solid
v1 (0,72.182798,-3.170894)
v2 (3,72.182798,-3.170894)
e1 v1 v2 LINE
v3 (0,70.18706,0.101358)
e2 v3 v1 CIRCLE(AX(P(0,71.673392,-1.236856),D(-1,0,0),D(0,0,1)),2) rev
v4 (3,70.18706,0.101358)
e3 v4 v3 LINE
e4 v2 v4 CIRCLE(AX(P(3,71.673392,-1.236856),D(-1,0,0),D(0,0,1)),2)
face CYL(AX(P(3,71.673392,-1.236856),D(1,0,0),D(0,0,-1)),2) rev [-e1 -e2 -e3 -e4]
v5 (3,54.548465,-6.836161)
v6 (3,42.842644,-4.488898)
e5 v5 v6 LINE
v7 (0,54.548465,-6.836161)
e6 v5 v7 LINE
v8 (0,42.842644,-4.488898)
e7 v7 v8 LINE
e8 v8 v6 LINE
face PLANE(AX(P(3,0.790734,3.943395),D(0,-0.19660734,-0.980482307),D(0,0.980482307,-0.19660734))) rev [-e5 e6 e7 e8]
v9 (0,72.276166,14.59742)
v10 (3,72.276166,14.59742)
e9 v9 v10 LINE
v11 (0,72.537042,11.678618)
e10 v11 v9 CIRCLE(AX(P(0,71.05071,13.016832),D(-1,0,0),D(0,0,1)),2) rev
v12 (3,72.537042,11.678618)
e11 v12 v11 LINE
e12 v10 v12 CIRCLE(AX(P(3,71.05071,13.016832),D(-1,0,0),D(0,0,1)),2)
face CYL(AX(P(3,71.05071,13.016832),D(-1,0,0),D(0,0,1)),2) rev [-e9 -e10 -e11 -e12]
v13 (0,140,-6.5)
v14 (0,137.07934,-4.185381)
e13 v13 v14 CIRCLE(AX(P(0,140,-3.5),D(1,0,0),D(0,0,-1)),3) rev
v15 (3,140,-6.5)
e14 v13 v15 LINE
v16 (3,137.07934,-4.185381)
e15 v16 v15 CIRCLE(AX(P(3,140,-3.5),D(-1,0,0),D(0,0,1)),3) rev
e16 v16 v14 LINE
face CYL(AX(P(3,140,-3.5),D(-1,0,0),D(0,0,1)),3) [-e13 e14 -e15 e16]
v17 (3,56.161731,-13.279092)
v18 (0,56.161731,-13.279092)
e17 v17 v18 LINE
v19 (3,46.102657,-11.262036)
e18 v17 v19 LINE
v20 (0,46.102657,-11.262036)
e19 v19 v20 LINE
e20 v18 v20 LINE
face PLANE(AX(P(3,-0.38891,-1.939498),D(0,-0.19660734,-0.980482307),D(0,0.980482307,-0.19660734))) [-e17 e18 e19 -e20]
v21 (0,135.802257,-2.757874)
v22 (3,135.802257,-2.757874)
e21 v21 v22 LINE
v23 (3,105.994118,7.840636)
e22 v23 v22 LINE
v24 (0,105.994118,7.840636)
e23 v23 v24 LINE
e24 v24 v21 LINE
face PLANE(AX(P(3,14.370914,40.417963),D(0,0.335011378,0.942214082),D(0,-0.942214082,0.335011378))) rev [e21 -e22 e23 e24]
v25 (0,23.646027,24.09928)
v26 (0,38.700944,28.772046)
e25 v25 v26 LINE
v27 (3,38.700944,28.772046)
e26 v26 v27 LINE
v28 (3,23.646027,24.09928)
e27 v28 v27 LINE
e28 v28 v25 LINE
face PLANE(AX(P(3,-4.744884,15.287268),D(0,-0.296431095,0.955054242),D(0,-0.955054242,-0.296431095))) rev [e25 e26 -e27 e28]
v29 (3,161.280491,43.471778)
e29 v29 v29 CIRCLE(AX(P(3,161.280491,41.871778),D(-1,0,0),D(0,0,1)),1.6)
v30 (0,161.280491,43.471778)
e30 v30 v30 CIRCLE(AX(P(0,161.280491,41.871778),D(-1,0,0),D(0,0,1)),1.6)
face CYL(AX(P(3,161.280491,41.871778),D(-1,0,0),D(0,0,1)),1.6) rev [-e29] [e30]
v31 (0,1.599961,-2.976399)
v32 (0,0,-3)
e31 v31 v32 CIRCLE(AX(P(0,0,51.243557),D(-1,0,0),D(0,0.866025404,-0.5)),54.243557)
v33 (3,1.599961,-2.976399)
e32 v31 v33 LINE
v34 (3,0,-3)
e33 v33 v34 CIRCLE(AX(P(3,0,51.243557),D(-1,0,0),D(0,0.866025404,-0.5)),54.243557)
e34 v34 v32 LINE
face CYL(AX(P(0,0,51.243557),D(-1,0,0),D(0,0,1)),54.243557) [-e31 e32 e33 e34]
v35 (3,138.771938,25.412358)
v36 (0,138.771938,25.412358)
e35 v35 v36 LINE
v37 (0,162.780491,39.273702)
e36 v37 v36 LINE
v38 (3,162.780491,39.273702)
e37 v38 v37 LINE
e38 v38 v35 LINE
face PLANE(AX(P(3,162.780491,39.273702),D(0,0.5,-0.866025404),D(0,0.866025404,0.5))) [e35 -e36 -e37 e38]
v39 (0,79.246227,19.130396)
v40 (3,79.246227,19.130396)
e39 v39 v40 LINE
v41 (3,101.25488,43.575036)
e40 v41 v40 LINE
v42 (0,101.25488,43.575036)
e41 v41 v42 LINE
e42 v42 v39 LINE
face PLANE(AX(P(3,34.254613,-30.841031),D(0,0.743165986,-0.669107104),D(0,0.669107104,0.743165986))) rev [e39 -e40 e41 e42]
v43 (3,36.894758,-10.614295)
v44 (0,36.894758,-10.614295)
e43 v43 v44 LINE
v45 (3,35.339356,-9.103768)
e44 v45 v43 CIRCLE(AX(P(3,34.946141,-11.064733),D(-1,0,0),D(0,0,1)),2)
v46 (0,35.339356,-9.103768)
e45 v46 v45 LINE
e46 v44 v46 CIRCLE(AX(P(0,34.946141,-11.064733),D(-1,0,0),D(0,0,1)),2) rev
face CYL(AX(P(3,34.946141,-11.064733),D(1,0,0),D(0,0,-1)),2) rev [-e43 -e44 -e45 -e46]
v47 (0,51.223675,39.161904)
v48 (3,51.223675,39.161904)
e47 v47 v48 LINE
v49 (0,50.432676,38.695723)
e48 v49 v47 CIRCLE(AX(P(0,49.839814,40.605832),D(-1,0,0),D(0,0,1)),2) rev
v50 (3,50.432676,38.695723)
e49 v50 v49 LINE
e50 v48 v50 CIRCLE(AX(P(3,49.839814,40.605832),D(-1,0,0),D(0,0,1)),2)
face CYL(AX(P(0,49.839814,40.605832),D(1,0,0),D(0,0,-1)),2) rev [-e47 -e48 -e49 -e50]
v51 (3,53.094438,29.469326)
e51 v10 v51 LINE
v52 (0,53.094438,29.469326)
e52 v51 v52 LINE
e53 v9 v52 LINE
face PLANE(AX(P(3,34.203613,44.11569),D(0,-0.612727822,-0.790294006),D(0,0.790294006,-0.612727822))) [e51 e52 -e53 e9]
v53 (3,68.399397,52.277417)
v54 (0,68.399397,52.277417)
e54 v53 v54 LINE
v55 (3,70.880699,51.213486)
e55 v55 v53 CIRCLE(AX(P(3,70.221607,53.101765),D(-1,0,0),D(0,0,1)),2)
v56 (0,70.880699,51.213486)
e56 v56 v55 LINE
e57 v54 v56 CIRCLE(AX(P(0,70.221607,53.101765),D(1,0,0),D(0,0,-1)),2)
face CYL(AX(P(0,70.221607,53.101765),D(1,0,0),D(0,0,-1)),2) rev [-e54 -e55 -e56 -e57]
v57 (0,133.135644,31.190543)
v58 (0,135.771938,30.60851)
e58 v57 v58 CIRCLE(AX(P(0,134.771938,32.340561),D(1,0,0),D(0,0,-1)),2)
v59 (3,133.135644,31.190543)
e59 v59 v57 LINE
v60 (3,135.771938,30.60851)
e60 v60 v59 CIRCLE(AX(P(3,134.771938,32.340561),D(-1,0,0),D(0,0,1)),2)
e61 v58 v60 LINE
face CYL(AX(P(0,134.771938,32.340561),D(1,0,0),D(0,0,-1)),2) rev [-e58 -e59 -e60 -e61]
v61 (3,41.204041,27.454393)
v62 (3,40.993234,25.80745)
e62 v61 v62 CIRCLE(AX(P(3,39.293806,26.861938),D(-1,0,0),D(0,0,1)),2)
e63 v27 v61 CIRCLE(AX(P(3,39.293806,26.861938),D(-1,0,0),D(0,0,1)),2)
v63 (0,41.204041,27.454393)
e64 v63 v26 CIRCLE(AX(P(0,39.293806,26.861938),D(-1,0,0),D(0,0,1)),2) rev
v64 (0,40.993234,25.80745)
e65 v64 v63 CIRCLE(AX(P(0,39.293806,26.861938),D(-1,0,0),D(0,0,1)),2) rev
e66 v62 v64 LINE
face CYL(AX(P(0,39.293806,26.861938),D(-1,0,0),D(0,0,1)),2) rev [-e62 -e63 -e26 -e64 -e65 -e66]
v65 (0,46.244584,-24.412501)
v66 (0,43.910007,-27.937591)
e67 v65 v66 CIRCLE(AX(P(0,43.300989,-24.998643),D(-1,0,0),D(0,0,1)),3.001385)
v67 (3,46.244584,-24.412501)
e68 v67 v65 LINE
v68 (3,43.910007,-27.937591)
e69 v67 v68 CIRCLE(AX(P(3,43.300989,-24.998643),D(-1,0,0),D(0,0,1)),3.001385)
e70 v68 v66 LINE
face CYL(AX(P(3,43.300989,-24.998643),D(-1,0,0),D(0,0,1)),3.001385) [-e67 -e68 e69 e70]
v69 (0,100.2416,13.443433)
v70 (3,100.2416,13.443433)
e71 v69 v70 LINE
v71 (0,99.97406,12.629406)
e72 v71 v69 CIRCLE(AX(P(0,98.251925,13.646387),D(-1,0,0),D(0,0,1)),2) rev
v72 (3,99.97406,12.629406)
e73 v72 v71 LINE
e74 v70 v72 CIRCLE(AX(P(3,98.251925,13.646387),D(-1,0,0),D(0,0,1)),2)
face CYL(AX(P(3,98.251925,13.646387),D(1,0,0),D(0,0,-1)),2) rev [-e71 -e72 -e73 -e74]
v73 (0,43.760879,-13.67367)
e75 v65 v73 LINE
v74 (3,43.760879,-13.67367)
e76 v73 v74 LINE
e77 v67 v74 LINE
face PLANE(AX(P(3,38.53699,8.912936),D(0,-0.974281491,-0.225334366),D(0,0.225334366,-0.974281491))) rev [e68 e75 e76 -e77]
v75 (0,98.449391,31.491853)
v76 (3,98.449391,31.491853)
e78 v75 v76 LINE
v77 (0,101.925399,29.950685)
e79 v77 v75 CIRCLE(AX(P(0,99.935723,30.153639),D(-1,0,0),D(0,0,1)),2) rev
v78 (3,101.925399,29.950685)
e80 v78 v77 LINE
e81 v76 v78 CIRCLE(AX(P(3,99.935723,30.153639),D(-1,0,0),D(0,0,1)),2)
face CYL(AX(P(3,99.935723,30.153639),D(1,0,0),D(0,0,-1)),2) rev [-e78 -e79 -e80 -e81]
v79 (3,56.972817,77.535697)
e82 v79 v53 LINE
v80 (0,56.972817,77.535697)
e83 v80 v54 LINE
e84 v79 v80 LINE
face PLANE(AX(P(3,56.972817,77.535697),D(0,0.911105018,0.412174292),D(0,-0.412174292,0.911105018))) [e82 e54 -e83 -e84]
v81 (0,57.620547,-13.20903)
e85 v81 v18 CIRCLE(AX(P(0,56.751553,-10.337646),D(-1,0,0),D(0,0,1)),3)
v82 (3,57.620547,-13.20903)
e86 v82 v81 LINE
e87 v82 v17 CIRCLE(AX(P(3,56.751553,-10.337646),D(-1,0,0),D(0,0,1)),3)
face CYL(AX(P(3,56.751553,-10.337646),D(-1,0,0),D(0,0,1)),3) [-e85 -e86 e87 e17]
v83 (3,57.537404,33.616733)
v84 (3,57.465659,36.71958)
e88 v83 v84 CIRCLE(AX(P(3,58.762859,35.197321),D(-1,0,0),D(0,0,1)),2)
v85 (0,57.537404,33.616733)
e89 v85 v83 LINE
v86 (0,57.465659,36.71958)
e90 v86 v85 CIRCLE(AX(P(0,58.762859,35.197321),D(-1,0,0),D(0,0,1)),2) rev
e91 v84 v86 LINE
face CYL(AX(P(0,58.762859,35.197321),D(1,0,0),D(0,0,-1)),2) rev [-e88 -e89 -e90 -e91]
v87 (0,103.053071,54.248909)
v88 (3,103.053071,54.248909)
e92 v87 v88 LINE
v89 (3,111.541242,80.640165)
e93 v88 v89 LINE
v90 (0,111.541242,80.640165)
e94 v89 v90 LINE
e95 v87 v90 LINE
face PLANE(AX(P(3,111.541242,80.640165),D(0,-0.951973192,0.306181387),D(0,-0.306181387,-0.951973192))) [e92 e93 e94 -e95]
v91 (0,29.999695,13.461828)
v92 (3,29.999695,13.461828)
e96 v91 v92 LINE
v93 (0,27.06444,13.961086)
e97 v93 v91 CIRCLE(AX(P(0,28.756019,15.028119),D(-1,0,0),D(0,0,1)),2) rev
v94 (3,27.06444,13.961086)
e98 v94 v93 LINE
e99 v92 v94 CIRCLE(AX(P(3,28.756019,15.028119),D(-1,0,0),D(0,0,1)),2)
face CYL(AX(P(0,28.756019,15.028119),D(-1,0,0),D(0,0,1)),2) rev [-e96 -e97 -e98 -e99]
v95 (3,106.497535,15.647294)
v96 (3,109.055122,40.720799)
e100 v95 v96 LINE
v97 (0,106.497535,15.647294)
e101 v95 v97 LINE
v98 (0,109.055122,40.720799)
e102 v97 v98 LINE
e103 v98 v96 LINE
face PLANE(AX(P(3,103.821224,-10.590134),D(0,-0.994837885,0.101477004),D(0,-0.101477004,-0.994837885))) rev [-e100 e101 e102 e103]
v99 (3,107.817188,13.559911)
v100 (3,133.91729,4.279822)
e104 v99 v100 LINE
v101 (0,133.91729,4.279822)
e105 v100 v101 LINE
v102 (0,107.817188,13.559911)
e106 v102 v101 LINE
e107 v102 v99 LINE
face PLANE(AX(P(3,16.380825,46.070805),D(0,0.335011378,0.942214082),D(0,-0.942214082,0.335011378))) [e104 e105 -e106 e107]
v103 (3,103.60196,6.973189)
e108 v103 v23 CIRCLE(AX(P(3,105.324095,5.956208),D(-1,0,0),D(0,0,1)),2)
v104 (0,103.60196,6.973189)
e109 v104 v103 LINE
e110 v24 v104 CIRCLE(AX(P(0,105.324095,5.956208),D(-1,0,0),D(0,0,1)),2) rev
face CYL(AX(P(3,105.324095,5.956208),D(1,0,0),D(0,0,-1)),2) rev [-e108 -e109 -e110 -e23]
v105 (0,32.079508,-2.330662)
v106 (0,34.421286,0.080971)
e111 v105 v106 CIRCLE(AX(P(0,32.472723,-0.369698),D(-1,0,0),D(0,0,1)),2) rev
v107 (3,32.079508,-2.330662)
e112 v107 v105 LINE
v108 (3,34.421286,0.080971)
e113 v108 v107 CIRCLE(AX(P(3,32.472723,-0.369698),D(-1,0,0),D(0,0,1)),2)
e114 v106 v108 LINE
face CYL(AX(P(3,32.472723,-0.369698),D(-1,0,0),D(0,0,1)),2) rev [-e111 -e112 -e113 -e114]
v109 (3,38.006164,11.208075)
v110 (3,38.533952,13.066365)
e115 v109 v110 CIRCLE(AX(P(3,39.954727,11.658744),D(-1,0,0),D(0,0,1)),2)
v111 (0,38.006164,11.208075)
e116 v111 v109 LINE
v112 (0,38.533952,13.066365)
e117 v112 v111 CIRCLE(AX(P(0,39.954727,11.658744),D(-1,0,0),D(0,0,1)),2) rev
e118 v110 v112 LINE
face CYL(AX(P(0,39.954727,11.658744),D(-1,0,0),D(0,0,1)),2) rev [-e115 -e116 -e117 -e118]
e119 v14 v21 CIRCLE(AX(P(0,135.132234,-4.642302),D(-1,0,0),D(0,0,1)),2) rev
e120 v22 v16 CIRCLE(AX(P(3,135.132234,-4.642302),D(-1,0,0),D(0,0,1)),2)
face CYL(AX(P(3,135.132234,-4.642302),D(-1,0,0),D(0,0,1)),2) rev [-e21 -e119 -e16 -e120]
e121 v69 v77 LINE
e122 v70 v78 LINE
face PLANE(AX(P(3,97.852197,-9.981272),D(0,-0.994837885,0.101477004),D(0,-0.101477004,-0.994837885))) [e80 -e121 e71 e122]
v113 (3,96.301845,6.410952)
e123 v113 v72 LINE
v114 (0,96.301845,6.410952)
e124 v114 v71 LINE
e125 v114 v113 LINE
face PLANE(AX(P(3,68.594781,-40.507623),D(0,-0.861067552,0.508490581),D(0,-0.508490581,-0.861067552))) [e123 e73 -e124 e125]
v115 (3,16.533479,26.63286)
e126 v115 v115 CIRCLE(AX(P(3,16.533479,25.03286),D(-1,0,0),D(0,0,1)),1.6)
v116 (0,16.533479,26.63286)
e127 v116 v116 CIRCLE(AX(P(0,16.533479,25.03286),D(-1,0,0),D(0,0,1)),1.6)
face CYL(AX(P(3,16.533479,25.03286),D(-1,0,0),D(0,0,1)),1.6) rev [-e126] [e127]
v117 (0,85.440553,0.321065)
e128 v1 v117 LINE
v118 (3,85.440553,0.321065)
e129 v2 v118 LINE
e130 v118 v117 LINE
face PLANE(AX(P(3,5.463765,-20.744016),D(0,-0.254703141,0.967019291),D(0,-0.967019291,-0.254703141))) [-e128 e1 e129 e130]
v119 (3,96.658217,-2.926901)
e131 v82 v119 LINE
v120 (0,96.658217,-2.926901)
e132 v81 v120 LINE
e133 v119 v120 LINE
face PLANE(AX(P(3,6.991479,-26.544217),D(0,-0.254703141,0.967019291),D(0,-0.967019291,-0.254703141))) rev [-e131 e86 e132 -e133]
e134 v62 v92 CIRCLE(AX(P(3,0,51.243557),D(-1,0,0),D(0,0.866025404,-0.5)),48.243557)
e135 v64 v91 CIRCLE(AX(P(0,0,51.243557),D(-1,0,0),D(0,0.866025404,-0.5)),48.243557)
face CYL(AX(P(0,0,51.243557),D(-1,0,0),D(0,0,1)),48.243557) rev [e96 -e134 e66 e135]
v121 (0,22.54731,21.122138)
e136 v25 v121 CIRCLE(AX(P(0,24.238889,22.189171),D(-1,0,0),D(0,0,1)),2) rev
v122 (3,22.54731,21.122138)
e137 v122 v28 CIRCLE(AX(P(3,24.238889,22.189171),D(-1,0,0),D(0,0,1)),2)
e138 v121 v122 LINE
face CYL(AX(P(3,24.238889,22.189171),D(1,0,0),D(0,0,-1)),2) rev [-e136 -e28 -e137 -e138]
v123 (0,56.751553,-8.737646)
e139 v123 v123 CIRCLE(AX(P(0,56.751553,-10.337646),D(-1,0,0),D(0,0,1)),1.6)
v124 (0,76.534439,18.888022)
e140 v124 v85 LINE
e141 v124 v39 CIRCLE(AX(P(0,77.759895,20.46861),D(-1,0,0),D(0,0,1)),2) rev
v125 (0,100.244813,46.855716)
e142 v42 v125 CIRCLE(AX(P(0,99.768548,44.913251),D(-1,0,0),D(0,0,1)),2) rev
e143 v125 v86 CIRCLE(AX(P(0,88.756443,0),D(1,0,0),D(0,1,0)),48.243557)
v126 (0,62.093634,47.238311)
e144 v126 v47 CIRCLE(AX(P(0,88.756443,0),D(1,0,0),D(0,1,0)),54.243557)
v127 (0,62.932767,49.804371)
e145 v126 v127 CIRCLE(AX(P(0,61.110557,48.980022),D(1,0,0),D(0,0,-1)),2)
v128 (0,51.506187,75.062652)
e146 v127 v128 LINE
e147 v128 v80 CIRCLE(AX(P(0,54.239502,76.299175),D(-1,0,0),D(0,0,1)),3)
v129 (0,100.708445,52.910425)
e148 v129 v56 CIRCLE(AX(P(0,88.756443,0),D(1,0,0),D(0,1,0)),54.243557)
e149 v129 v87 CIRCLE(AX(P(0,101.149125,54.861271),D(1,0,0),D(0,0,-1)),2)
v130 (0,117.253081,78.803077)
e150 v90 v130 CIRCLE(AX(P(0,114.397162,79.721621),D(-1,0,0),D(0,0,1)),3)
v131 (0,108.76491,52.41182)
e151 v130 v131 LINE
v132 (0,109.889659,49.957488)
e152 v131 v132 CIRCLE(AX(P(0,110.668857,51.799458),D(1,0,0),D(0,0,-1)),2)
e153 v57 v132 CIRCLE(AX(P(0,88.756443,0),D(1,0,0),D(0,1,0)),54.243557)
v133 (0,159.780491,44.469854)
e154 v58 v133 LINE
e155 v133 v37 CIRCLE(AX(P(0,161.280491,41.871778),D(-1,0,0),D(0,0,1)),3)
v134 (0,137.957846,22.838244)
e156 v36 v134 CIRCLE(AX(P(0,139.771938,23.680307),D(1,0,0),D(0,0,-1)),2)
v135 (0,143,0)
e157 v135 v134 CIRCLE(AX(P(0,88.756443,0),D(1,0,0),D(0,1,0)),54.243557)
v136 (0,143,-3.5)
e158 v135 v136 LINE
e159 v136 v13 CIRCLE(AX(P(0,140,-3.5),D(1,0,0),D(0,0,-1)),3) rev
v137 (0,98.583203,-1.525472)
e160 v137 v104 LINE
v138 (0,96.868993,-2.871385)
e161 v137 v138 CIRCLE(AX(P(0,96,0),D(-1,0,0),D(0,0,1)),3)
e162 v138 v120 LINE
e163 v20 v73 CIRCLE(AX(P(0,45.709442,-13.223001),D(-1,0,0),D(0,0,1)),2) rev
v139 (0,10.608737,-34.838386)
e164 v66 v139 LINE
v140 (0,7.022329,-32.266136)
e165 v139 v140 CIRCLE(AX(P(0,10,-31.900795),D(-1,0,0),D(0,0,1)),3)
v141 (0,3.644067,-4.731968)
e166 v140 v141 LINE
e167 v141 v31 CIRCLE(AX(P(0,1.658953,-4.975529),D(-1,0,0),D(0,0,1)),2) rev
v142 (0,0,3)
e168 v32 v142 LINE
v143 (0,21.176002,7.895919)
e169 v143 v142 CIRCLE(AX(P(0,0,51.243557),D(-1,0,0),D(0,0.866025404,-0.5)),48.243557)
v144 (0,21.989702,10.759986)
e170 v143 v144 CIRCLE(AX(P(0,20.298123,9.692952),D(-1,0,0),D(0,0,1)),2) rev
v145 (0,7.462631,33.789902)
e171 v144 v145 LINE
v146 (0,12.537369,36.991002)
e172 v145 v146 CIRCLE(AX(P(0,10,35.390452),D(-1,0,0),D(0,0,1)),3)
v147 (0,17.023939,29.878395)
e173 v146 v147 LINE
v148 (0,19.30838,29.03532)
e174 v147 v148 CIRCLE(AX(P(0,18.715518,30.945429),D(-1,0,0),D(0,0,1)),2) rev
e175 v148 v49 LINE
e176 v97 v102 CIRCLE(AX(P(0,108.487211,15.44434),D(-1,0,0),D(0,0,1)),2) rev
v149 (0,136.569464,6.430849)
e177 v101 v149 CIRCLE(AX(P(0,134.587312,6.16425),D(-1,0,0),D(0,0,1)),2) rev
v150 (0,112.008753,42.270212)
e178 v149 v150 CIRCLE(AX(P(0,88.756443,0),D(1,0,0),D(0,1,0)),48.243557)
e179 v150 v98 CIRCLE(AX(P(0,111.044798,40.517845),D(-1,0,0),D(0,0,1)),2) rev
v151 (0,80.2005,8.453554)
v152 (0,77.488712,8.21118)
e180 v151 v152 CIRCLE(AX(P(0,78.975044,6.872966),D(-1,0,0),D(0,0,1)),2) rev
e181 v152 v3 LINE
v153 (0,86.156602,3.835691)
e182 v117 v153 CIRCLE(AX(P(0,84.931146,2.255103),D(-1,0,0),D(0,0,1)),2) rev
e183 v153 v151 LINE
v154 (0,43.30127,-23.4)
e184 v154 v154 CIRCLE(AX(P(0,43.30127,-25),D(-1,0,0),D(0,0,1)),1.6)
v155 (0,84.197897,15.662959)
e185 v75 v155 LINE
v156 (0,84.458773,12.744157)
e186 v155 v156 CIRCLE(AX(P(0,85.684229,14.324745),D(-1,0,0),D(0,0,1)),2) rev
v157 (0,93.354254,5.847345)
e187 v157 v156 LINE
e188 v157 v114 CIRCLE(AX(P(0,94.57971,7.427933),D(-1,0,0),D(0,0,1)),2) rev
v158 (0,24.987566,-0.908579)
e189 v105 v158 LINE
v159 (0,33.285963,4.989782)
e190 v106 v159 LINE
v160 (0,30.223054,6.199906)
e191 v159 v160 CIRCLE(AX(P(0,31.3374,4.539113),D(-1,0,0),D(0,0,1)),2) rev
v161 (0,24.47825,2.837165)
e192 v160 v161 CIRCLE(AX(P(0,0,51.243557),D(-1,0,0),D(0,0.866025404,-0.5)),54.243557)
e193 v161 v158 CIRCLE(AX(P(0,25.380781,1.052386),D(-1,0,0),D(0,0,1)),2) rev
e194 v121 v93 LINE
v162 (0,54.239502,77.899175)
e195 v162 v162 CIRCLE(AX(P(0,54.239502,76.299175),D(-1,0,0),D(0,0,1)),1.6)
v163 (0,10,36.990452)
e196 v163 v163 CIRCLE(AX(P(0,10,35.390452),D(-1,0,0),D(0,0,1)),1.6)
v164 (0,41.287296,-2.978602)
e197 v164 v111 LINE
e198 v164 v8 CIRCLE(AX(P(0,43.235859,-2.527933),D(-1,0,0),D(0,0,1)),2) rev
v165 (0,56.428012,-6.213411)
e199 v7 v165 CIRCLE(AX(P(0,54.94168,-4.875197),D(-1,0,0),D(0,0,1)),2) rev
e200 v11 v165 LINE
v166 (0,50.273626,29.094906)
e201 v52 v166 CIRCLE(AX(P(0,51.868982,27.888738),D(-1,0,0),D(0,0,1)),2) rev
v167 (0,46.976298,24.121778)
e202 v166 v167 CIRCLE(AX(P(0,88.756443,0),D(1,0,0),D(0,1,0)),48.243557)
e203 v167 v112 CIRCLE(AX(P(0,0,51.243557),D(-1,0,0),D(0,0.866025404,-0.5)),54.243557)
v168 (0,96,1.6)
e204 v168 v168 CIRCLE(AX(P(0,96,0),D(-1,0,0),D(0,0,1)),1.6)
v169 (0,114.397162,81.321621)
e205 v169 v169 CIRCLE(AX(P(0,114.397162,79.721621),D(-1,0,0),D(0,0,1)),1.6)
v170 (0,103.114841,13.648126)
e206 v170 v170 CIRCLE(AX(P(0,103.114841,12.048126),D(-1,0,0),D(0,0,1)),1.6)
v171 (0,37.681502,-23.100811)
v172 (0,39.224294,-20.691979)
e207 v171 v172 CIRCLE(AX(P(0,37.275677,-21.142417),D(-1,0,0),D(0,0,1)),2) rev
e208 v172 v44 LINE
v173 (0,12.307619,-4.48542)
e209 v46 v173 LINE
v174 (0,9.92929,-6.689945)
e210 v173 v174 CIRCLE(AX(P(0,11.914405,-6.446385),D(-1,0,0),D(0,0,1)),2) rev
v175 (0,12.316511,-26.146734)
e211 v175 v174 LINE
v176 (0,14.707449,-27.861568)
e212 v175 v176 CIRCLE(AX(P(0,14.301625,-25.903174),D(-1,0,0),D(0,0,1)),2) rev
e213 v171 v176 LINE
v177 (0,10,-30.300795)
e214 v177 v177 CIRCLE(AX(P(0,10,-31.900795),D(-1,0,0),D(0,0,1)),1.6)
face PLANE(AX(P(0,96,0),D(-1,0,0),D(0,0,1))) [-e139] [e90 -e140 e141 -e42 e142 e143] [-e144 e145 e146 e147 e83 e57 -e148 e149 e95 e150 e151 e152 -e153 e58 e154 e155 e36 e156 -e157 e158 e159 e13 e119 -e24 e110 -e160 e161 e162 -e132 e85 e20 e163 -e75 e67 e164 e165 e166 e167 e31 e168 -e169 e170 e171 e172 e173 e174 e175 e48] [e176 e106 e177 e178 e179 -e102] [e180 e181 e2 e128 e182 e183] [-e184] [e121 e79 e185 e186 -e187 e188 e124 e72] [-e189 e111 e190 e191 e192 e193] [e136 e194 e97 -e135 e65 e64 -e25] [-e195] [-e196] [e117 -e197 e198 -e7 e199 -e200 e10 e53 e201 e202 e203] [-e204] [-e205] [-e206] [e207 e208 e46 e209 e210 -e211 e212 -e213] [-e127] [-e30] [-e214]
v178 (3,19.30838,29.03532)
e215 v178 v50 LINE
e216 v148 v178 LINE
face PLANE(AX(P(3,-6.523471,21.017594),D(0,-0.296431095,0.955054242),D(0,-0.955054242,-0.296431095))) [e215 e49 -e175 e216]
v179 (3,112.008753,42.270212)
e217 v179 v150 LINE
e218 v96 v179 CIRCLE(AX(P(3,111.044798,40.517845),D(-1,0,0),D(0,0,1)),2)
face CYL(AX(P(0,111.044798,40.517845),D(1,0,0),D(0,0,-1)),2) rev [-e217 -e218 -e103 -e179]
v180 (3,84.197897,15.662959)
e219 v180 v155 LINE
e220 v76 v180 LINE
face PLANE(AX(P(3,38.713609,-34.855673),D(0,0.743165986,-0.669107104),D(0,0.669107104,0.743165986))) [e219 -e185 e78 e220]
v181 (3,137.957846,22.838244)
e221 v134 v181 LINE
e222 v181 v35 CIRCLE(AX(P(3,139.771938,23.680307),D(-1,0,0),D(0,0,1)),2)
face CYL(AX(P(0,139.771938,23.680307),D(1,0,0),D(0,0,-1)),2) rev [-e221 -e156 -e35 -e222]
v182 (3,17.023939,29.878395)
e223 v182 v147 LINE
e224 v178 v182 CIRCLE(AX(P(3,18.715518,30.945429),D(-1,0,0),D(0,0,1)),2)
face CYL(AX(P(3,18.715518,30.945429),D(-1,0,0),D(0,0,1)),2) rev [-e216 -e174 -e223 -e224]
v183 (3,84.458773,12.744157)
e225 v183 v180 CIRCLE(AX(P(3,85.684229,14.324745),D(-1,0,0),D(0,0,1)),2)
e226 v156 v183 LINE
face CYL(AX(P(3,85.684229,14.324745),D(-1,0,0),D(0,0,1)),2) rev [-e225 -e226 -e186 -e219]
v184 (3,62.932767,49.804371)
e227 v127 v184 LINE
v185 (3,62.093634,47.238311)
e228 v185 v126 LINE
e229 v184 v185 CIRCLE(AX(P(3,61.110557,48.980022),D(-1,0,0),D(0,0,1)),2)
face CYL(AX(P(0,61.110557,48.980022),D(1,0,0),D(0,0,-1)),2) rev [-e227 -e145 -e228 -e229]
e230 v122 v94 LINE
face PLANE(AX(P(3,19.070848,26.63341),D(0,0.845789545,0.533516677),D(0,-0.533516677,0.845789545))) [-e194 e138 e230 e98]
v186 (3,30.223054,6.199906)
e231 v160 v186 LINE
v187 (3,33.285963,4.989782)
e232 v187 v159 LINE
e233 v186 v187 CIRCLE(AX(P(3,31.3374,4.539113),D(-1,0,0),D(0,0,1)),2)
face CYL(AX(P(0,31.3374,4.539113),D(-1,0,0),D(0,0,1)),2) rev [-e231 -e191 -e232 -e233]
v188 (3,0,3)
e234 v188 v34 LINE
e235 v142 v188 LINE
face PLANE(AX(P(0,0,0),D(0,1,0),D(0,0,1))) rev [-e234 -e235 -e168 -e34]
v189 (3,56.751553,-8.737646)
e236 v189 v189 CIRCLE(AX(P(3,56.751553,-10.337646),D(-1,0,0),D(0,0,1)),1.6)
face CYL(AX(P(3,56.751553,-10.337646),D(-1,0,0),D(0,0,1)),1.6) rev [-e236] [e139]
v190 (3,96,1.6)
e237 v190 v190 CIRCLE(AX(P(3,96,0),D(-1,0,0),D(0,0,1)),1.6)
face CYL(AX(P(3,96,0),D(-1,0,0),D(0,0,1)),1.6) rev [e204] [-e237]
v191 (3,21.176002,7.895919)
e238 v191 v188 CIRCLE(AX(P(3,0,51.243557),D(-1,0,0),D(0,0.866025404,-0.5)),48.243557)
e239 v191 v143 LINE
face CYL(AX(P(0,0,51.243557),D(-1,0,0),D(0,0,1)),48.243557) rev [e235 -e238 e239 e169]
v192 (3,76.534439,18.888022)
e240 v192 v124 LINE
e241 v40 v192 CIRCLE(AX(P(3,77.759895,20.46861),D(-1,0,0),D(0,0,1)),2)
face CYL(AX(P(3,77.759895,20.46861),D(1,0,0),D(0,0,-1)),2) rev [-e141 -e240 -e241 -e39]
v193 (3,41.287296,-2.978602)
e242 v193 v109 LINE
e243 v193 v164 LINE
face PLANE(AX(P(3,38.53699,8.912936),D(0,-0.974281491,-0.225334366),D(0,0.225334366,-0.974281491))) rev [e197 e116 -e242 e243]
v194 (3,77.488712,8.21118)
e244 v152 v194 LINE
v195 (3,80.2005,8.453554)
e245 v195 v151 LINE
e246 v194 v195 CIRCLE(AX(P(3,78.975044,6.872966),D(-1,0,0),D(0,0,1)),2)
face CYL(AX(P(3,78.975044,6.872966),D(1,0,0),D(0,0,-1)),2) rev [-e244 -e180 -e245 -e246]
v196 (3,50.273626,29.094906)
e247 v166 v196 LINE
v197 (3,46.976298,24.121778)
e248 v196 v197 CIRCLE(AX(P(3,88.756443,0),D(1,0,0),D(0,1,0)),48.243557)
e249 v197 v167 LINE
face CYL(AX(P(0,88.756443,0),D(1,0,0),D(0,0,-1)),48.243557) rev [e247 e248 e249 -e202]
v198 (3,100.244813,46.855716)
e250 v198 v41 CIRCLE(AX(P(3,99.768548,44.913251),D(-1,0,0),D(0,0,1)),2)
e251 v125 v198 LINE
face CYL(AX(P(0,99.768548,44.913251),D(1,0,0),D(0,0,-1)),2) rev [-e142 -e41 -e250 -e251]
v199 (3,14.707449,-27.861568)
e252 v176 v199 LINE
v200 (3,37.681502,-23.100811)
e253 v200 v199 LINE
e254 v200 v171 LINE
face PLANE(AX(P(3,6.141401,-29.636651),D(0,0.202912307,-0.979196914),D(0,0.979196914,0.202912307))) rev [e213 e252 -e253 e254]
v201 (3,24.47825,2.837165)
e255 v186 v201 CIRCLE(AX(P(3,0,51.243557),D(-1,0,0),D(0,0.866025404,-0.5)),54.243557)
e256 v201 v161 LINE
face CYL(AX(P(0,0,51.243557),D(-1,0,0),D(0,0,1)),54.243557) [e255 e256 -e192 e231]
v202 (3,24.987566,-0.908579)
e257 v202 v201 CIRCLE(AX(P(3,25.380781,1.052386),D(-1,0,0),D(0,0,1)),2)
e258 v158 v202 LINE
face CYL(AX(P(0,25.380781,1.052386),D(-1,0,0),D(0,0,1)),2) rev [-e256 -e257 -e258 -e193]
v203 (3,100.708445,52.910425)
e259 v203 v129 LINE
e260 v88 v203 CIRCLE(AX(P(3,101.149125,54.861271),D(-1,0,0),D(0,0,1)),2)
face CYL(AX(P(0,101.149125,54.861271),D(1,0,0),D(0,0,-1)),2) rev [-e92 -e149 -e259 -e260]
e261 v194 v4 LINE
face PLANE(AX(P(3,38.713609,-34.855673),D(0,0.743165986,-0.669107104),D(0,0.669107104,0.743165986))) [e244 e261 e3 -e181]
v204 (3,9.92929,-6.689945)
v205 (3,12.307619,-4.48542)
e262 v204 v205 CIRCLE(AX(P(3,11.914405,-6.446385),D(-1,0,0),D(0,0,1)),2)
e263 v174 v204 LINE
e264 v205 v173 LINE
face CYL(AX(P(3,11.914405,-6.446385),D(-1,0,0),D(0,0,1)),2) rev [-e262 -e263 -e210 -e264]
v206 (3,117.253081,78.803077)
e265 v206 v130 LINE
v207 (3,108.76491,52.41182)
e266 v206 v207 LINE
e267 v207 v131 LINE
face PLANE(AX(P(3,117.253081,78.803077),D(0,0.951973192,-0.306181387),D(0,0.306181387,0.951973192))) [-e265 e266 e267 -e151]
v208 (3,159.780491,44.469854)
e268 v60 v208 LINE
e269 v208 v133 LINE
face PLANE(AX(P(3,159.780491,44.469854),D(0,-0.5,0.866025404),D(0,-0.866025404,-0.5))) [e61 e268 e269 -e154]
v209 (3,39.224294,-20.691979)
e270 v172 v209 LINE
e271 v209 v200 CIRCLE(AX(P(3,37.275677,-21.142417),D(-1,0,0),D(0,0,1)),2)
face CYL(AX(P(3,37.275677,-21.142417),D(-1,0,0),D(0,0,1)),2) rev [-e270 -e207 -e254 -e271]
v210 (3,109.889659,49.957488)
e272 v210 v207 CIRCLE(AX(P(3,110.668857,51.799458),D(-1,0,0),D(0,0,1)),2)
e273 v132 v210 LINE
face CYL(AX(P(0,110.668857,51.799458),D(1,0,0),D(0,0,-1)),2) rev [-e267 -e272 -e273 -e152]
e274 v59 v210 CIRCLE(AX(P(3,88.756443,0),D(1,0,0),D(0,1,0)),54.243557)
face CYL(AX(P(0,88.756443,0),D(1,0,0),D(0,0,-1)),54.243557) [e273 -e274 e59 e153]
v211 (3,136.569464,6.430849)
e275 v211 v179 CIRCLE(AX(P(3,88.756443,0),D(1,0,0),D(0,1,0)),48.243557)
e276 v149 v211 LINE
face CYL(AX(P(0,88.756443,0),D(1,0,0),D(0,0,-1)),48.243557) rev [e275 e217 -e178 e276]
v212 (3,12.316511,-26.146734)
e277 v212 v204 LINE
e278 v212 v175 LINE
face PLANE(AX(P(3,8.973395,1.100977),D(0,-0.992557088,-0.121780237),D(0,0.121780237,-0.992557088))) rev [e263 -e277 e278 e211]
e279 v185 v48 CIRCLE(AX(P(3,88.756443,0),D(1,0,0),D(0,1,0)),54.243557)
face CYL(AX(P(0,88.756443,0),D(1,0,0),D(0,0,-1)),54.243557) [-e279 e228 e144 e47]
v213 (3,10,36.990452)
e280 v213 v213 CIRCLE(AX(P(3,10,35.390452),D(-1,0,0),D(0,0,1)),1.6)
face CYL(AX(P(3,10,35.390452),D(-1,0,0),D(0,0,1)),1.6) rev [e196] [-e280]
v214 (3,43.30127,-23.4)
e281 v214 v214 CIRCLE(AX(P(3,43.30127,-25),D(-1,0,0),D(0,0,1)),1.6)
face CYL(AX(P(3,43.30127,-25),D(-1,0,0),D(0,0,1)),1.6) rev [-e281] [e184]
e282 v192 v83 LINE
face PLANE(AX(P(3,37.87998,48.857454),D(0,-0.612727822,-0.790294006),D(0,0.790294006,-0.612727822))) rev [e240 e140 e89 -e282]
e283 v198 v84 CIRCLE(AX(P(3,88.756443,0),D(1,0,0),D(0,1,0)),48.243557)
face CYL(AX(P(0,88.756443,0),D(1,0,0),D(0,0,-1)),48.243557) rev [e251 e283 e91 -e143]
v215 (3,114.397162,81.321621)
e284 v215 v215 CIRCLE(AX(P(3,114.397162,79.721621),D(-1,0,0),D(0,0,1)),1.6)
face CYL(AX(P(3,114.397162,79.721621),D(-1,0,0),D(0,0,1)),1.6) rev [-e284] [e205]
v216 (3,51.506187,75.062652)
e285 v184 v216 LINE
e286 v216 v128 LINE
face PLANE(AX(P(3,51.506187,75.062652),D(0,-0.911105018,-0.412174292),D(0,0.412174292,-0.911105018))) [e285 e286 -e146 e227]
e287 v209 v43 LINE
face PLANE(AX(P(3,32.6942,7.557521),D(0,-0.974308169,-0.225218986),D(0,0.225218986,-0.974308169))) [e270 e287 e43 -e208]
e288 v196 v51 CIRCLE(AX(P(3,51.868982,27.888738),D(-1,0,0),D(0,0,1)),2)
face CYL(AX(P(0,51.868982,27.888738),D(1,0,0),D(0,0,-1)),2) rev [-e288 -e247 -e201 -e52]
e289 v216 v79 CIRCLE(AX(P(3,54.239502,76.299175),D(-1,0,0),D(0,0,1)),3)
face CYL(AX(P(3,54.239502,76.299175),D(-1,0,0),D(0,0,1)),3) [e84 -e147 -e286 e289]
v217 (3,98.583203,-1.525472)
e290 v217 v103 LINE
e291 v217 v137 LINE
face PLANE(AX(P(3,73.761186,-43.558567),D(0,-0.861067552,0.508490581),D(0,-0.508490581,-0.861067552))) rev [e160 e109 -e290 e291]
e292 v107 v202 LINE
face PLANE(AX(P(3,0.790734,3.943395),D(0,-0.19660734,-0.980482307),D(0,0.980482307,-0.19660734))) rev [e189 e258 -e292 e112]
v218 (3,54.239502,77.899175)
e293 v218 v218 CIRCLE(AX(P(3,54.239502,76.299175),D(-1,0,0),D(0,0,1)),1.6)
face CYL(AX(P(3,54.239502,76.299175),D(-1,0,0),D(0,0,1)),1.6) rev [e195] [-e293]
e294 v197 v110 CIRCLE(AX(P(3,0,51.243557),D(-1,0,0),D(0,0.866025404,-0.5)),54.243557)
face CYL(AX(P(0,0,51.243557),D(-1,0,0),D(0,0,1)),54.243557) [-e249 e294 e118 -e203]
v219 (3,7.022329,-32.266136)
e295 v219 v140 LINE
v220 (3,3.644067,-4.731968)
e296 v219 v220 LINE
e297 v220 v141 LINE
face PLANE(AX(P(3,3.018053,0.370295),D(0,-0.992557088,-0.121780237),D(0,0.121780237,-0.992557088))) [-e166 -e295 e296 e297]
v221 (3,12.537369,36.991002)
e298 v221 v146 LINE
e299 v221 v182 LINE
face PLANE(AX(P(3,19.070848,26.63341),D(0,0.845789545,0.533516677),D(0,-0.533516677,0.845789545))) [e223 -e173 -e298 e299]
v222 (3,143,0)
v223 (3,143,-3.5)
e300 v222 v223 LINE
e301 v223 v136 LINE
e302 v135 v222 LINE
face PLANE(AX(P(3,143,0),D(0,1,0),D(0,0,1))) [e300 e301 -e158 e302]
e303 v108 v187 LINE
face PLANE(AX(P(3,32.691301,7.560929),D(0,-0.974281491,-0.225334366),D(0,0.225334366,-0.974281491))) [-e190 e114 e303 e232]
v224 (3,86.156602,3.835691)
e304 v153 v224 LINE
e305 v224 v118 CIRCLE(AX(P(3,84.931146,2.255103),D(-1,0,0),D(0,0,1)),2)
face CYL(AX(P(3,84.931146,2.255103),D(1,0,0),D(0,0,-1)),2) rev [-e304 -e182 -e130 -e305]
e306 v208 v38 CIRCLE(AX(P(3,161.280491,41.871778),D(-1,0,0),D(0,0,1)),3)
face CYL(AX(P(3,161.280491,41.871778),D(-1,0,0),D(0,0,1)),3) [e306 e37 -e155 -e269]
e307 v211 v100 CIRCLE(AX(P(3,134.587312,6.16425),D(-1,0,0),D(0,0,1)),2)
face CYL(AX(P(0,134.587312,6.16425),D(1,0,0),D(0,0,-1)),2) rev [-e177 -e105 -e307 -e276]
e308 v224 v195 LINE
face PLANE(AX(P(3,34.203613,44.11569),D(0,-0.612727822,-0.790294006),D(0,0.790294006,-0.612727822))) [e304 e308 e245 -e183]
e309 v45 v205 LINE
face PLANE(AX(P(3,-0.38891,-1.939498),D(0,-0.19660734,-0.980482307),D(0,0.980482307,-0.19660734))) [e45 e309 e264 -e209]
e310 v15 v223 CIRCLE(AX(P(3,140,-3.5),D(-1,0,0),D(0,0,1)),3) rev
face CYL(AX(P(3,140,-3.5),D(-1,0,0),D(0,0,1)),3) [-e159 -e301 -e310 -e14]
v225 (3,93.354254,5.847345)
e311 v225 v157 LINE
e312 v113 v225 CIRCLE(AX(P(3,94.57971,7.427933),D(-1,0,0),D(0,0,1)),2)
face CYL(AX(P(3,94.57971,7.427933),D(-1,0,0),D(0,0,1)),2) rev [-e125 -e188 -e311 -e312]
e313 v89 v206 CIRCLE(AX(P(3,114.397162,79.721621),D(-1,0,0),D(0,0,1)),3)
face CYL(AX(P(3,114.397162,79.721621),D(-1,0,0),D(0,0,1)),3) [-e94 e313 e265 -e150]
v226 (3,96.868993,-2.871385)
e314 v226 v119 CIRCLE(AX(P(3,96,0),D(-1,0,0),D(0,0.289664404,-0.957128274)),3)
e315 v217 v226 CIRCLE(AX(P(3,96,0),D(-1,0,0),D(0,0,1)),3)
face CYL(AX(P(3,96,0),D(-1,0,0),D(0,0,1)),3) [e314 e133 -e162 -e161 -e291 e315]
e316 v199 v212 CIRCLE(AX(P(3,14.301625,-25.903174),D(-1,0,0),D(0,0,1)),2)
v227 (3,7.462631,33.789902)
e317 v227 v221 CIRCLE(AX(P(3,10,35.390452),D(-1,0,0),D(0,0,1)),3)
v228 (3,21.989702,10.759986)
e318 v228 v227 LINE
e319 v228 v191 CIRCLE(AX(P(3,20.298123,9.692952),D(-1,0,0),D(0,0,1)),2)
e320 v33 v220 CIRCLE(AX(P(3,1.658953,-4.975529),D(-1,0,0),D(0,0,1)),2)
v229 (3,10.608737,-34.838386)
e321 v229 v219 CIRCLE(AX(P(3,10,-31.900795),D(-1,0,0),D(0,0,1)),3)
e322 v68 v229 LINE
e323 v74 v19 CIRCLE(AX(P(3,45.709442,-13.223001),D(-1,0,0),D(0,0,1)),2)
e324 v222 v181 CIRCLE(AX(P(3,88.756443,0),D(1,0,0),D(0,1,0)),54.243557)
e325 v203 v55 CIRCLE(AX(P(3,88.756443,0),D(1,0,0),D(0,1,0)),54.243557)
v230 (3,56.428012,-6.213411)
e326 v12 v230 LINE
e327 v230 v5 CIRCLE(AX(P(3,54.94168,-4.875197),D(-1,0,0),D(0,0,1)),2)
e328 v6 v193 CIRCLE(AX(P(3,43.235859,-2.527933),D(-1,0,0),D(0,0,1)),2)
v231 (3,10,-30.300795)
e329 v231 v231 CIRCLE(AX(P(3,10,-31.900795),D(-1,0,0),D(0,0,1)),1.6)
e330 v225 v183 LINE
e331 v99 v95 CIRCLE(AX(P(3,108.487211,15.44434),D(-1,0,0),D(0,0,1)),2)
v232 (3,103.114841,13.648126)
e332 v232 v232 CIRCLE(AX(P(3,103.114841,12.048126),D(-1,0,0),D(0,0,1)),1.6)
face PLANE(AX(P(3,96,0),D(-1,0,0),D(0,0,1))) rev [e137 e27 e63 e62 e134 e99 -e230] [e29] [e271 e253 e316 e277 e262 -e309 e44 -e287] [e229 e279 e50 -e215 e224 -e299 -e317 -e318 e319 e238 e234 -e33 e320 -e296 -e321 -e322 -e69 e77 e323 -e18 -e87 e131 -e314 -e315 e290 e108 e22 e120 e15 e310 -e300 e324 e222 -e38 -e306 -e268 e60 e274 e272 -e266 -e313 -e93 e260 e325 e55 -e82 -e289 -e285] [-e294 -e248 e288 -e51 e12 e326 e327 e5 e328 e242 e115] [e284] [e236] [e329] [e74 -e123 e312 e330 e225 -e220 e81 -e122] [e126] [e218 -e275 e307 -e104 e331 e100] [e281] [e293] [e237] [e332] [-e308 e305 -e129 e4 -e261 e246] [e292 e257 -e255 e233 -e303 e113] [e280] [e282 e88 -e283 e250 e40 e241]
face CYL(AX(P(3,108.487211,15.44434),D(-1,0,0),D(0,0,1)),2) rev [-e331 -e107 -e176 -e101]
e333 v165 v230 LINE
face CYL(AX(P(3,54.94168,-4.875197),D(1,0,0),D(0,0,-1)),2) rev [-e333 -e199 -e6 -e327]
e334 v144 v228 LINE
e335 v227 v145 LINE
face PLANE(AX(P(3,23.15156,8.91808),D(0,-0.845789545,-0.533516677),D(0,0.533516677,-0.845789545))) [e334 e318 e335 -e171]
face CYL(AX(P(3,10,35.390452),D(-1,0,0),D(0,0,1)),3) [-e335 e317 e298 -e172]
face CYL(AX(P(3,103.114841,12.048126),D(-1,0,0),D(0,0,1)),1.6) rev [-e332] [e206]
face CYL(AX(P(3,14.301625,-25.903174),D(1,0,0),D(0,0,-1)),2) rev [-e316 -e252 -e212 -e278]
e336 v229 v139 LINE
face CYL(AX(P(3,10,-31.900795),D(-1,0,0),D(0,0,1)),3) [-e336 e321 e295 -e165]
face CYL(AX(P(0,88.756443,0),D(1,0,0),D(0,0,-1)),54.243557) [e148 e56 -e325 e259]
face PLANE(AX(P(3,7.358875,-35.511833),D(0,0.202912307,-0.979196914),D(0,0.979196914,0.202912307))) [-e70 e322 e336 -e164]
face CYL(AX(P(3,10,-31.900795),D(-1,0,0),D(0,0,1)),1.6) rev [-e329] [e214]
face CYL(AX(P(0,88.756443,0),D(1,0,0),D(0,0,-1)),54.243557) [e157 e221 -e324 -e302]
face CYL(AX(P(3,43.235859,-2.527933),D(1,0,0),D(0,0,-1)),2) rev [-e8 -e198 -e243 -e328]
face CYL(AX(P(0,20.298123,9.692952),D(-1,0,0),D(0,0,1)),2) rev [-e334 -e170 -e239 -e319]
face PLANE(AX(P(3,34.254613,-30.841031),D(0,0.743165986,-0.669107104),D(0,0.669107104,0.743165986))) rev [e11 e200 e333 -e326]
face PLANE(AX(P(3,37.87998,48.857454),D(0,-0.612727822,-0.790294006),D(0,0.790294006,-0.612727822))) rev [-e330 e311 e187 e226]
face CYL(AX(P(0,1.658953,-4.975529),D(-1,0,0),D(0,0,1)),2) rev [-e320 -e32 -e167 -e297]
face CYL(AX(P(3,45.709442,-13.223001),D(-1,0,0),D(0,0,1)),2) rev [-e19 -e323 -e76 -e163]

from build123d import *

# Parameters (mm, degrees)
SKETCH2_W             = 3
SKETCH2_H             = 6
SKETCH3_R             = 3
SKETCH3_R_2           = 1.6
BOSS_EXTRUDE1_DEPTH   = 3
BOSS_EXTRUDE1_2_DEPTH = 3
BOSS_EXTRUDE1_3_DEPTH = 3
SKETCH5_W             = 6.5
SKETCH5_H             = 6
BOSS_EXTRUDE2_DEPTH   = 3
FILLET1_R             = 3
SKETCH6_R             = 3
SKETCH6_R_2           = 1.6
BOSS_EXTRUDE3_DEPTH   = 3
BOSS_EXTRUDE3_2_DEPTH = 3
BOSS_EXTRUDE3_3_DEPTH = 3
BOSS_EXTRUDE3_4_DEPTH = 3
BOSS_EXTRUDE3_5_DEPTH = 3
BOSS_EXTRUDE3_6_DEPTH = 3
BOSS_EXTRUDE3_7_DEPTH = 3
BOSS_EXTRUDE4_START   = -3
SKETCH7_R             = 1.6
BOSS_EXTRUDE4_DEPTH   = 3
FILLET2_R             = 2
SKETCH8_R             = 1.6
BOSS_EXTRUDE7_DEPTH   = 3
FILLET3_R             = 2
BOSS_EXTRUDE8_START   = -3
BOSS_EXTRUDE8_DEPTH   = 3
FILLET4_R             = 2


with BuildPart() as part:
    # Sweep1: sweep along a path in Sketch1
    with BuildLine(Plane(origin=(0, 0, 0), x_dir=(0, 0, -1), z_dir=(1, 0, 0))) as sweep1_path:
        ThreePointArc((0, 140), (-49.497474683, 102.019251839), (-25.621778265, 44.378221735))
        ThreePointArc((-25.621778265, 44.378221735), (-6.865334795, 25.621778265), (0, 0))
    # Sketch2 → Sweep1 (sweep)
    with BuildSketch(Plane(origin=(0, 0, 0), x_dir=(1, 0, 0), z_dir=(0, 1, 0))):
        with Locations((1.5, 0)):
            Rectangle(SKETCH2_W, SKETCH2_H)
    sweep(path=sweep1_path.line)

    # Sketch5 → Boss-Extrude2 (add)
    with BuildSketch(Plane.ZY):
        with Locations((-3.25, 140)):
            Rectangle(SKETCH5_W, SKETCH5_H)
    extrude(amount=-BOSS_EXTRUDE2_DEPTH)

    # Fillet1
    fillet1_edges = [part.edges().sort_by_distance(p)[0] for p in [
        (1.5, 137, -6.5),
        (1.5, 143, -6.5),
    ]]
    fillet(fillet1_edges, radius=FILLET1_R - 0.0001)  # a hair under: the kernel refuses the full size



with BuildPart() as body_2:
    # Sketch3 → Boss-Extrude1 (new body)
    with BuildSketch(Plane.ZY):
        with Locations((0, 96)):
            Circle(SKETCH3_R)
        with Locations((0, 96)):
            Circle(SKETCH3_R_2, mode=Mode.SUBTRACT)
    extrude(amount=-BOSS_EXTRUDE1_DEPTH)


with BuildPart() as body_3:
    # Sketch3 → Boss-Extrude1 2 (new body)
    with BuildSketch(Plane.ZY):
        with Locations((-25, 43.301270189)):
            Circle(SKETCH3_R)
        with Locations((-25, 43.301270189)):
            Circle(SKETCH3_R_2, mode=Mode.SUBTRACT)
    extrude(amount=-BOSS_EXTRUDE1_2_DEPTH)


with BuildPart() as body_4:
    # Sketch3 → Boss-Extrude1 3 (new body)
    with BuildSketch(Plane.ZY):
        with Locations((25.032859693, 16.533479235)):
            Circle(SKETCH3_R)
        with Locations((25.032859693, 16.533479235)):
            Circle(SKETCH3_R_2, mode=Mode.SUBTRACT)
    extrude(amount=-BOSS_EXTRUDE1_3_DEPTH)


with BuildPart() as body_5:
    # Sketch6 → Boss-Extrude3 (new body)
    with BuildSketch(Plane.ZY):
        with Locations((12.048125899, 103.114840794)):
            Circle(SKETCH6_R)
        with Locations((12.048125899, 103.114840794)):
            Circle(SKETCH6_R_2, mode=Mode.SUBTRACT)
    extrude(amount=-BOSS_EXTRUDE3_DEPTH)


with BuildPart() as body_6:
    # Sketch6 → Boss-Extrude3 2 (new body)
    with BuildSketch(Plane.ZY):
        with Locations((41.871778265, 161.280490828)):
            Circle(SKETCH6_R)
        with Locations((41.871778265, 161.280490828)):
            Circle(SKETCH6_R_2, mode=Mode.SUBTRACT)
    extrude(amount=-BOSS_EXTRUDE3_2_DEPTH)


with BuildPart() as body_7:
    # Sketch6 → Boss-Extrude3 3 (new body)
    with BuildSketch(Plane.ZY):
        with Locations((79.721620809, 114.397161787)):
            Circle(SKETCH6_R)
        with Locations((79.721620809, 114.397161787)):
            Circle(SKETCH6_R_2, mode=Mode.SUBTRACT)
    extrude(amount=-BOSS_EXTRUDE3_3_DEPTH)


with BuildPart() as body_8:
    # Sketch6 → Boss-Extrude3 4 (new body)
    with BuildSketch(Plane.ZY):
        with Locations((76.299174561, 54.239502389)):
            Circle(SKETCH6_R)
        with Locations((76.299174561, 54.239502389)):
            Circle(SKETCH6_R_2, mode=Mode.SUBTRACT)
    extrude(amount=-BOSS_EXTRUDE3_4_DEPTH)


with BuildPart() as body_9:
    # Sketch6 → Boss-Extrude3 5 (new body)
    with BuildSketch(Plane.ZY):
        with Locations((35.390452374, 10)):
            Circle(SKETCH6_R)
        with Locations((35.390452374, 10)):
            Circle(SKETCH6_R_2, mode=Mode.SUBTRACT)
    extrude(amount=-BOSS_EXTRUDE3_5_DEPTH)


with BuildPart() as body_10:
    # Sketch6 → Boss-Extrude3 6 (new body)
    with BuildSketch(Plane.ZY):
        with Locations((-10.337645521, 56.751553408)):
            Circle(SKETCH6_R)
        with Locations((-10.337645521, 56.751553408)):
            Circle(SKETCH6_R_2, mode=Mode.SUBTRACT)
    extrude(amount=-BOSS_EXTRUDE3_6_DEPTH)


with BuildPart() as body_11:
    # Sketch6 → Boss-Extrude3 7 (new body)
    with BuildSketch(Plane.ZY):
        with Locations((-31.900795415, 10)):
            Circle(SKETCH6_R)
        with Locations((-31.900795415, 10)):
            Circle(SKETCH6_R_2, mode=Mode.SUBTRACT)
    extrude(amount=-BOSS_EXTRUDE3_7_DEPTH)


with BuildPart() as part_1:
    add(part.part)

    add(body_4.part)  # Boss-Extrude4 merges body 4

    add(body_6.part)  # Boss-Extrude4 merges body 6

    add(body_7.part)  # Boss-Extrude4 merges body 7

    add(body_8.part)  # Boss-Extrude4 merges body 8

    add(body_9.part)  # Boss-Extrude4 merges body 9
    # Sketch7 → Boss-Extrude4 (add)
    # profile 1 of 4: a face of its own
    with BuildSketch(Plane.ZY.offset(BOSS_EXTRUDE4_START)):
        with BuildLine():
            Line((39.273702054, 162.780490828), (24.482190705, 137.160841652))
            ThreePointArc((24.482190705, 137.160841652), (27.121778265, 135.732741417), (29.678343128, 134.160841652))
            Line((29.678343128, 134.160841652), (44.469854476, 159.780490828))
            ThreePointArc((44.469854476, 159.780490828), (40.371778265, 158.682414617), (39.273702054, 162.780490828))
        make_face()
    # profile 2 of 4: a face of its own
    with BuildSketch(Plane.ZY.offset(BOSS_EXTRUDE4_START)):
        with BuildLine():
            Line((78.803076647, 117.253081363), (50.640832104, 108.195310432))
            ThreePointArc((50.640832104, 108.195310432), (51.638411649, 105.364810861), (52.477920428, 102.483471281))
            Line((52.477920428, 102.483471281), (80.640164971, 111.541242212))
            ThreePointArc((80.640164971, 111.541242212), (76.865701234, 113.478617625), (78.803076647, 117.253081363))
        make_face()
    # profile 3 of 4: a face of its own
    with BuildSketch(Plane.ZY.offset(BOSS_EXTRUDE4_START)):
        with BuildLine():
            Line((77.535697435, 56.972817442), (50.582457015, 69.166178863))
            ThreePointArc((50.582457015, 69.166178863), (49.421576536, 66.398643988), (48.109411266, 63.699548757))
            Line((48.109411266, 63.699548757), (75.062651686, 51.506187336))
            ThreePointArc((75.062651686, 51.506187336), (73.565859507, 55.476025263), (77.535697435, 56.972817442))
        make_face()
    # profile 4 of 4: a face of its own
    with BuildSketch(Plane.ZY.offset(BOSS_EXTRUDE4_START)):
        with BuildLine():
            Line((26.633409725, 19.070847871), (36.991002405, 12.537368636))
            ThreePointArc((36.991002405, 12.537368636), (32.853083738, 11.600550032), (33.789902342, 7.462631364))
            Line((33.789902342, 7.462631364), (8.91807963, 23.151560463))
            ThreePointArc((8.91807963, 23.151560463), (10.439660785, 25.738741979), (12.119179694, 28.226297736))
            Line((12.119179694, 28.226297736), (26.633409725, 19.070847871))
        make_face()
        with Locations((25.032859693, 16.533479235)):
            Circle(SKETCH7_R, mode=Mode.SUBTRACT)
    extrude(amount=BOSS_EXTRUDE4_DEPTH)

    # Fillet2
    fillet2_edges = [part_1.edges().sort_by_distance(p)[0] for p in [
        (1.5, 28.226297736, 12.119179694),
        (1.5, 23.151560463, 8.91807963),
        (1.5, 134.160841652, 29.678343128),
        (1.5, 137.160841652, 24.482190705),
        (1.5, 102.483471281, 52.477920428),
        (1.5, 108.195310432, 50.640832104),
        (1.5, 63.699548757, 48.109411266),
        (1.5, 69.166178863, 50.582457015),
    ]]
    fillet(fillet2_edges, radius=FILLET2_R)


    add(body_2.part)  # Boss-Extrude7 merges body 2

    add(body_3.part)  # Boss-Extrude7 merges body 3

    add(body_5.part)  # Boss-Extrude7 merges body 5

    add(body_10.part)  # Boss-Extrude7 merges body 10

    add(body_11.part)  # Boss-Extrude7 merges body 11
    # Sketch8 → Boss-Extrude7 (add)
    with BuildSketch(Plane.ZY):
        with BuildLine():
            Line((8.393057458, 104.440441929), (-3.183740882, 137))
            Line((-3.183740882, 137), (0, 137))
            ThreePointArc((0, 137), (1.611919949, 136.973063641), (3.222039895, 136.892284644))
            Line((3.222039895, 136.892284644), (14.085757994, 106.338253219))
            Line((14.085757994, 106.338253219), (43.626634647, 109.351527739))
            ThreePointArc((43.626634647, 109.351527739), (44.894446443, 106.417967334), (45.965255364, 103.406905783))
            Line((45.965255364, 103.406905783), (17.749481479, 78.00292457))
            Line((17.749481479, 78.00292457), (35.085165165, 55.64342591))
            ThreePointArc((35.085165165, 55.64342591), (32.948761859, 53.516979249), (30.683731318, 51.528102397))
            Line((30.683731318, 51.528102397), (13.27841441, 73.977413723))
            Line((13.27841441, 73.977413723), (-7.060176196, 55.665629125))
            Line((-7.060176196, 55.665629125), (-4.235299675, 41.577948329))
            Line((-4.235299675, 41.577948329), (12.29552278, 37.754656561))
            ThreePointArc((12.29552278, 37.754656561), (10.017040747, 35.25248674), (7.899021501, 32.613106385))
            Line((7.899021501, 32.613106385), (-2.940358436, 35.120066471))
            Line((-2.940358436, 35.120066471), (0.342699526, 18.747431326))
            ThreePointArc((0.342699526, 18.747431326), (-1.831079393, 11.200287796), (-2.892183905, 3.418337688))
            Line((-2.892183905, 3.418337688), (-32.266136125, 7.022328735))
            ThreePointArc((-32.266136125, 7.022328735), (-34.3386059, 8.251549247), (-34.838386155, 10.608736922))
            Line((-34.838386155, 10.608736922), (-27.937590741, 43.910007111))
            ThreePointArc((-27.937590741, 43.910007111), (-26.655895697, 45.803353823), (-24.412500996, 46.24458412))
            Line((-24.412500996, 46.24458412), (-10.652340269, 43.062098228))
            Line((-10.652340269, 43.062098228), (-13.279092442, 56.161731388))
            ThreePointArc((-13.279092442, 56.161731388), (-13.334191648, 56.895467664), (-13.209030344, 57.62054662))
            Line((-13.209030344, 57.62054662), (-2.871384822, 96.868993212))
            ThreePointArc((-2.871384822, 96.868993212), (-2.359600691, 97.852642594), (-1.525471744, 98.583202655))
            Line((-1.525471744, 98.583202655), (8.393057458, 104.440441929))
        make_face()
        with Locations((-31.900795415, 10)):
            Circle(SKETCH8_R, mode=Mode.SUBTRACT)
        with Locations((-25, 43.301270189)):
            Circle(SKETCH8_R, mode=Mode.SUBTRACT)
        with Locations((-10.337645521, 56.751553408)):
            Circle(SKETCH8_R, mode=Mode.SUBTRACT)
        with Locations((0, 96)):
            Circle(SKETCH8_R, mode=Mode.SUBTRACT)
        with Locations((12.048125899, 103.114840794)):
            Circle(SKETCH8_R, mode=Mode.SUBTRACT)
        Polygon((13.007082489, 100.197091076), (36.042793369, 102.546815544), (14.063162087, 82.757525254), (4.456760087, 95.147825893), align=None, mode=Mode.SUBTRACT)
        Polygon((-28.302222418, 12.580974896), (-3.940880735, 9.591998246), (-9.357399029, 36.60421637), (-22.685611431, 39.685137358), align=None, mode=Mode.SUBTRACT)
        Polygon((-4.877171693, 65.704656689), (1.353061884, 89.3586879), (9.592095018, 78.732014407), align=None, mode=Mode.SUBTRACT)
    extrude(amount=-BOSS_EXTRUDE7_DEPTH)

    # Fillet3
    fillet3_edges = [part_1.edges().sort_by_distance(p)[0] for p in [
        (1.5, 43.062098228, -10.652340269),
        (1.5, 12.580974896, -28.302222418),
        (1.5, 9.591998246, -3.940880735),
        (1.5, 3.418337688, -2.892183905),
        (1.5, 39.685137358, -22.685611431),
        (1.5, 36.60421637, -9.357399029),
        (1.5, 35.120066471, -2.940358436),
        (1.5, 32.613106385, 7.899021501),
        (1.5, 18.747431326, 0.342699526),
        (1.5, 41.577948329, -4.235299675),
        (1.5, 37.754656561, 12.29552278),
        (1.5, 55.64342591, 35.085165165),
        (1.5, 51.528102397, 30.683731318),
        (1.5, 55.665629125, -7.060176196),
        (1.5, 78.00292457, 17.749481479),
        (1.5, 73.977413723, 13.27841441),
        (1.5, 103.406905783, 45.965255364),
        (1.5, 78.732014407, 9.592095018),
        (1.5, 89.3586879, 1.353061884),
        (1.5, 65.704656689, -4.877171693),
        (1.5, 82.757525254, 14.063162087),
        (1.5, 100.197091076, 13.007082489),
        (1.5, 95.147825893, 4.456760087),
        (1.5, 102.546815544, 36.042793369),
        (1.5, 104.440441929, 8.393057458),
        (1.5, 109.351527739, 43.626634647),
        (1.5, 106.338253219, 14.085757994),
        (1.5, 136.892284644, 3.222039895),
        (1.5, 137, -3.183740882),
    ]]
    fillet(fillet3_edges, radius=FILLET3_R)

    # Sketch10 → Boss-Extrude8 (add)
    with BuildSketch(Plane.ZY.offset(BOSS_EXTRUDE8_START)):
        with BuildLine():
            Line((30.355249084, 43.801774324), (22.167696965, 17.422772519))
            ThreePointArc((22.167696965, 17.422772519), (25.482588399, 19.499578372), (28.032859693, 16.533479235))
            ThreePointArc((28.032859693, 16.533479235), (27.99895883, 16.083750529), (27.89802242, 15.64418595))
            Line((27.89802242, 15.64418595), (38.836878349, 50.887454771))
            ThreePointArc((38.836878349, 50.887454771), (34.776994429, 47.128038702), (30.355249084, 43.801774324))
        make_face()
    extrude(amount=BOSS_EXTRUDE8_DEPTH)

    # Fillet4
    fillet4_edges = [part_1.edges().sort_by_distance(p)[0] for p in [
        (1.5, 43.801774324, 30.355249084),
        (1.5, 50.887454771, 38.836878349),
        (1.5, 17.842702636, 28.580401158),
        (1.5, 21.156725283, 23.326646538),
    ]]
    fillet(fillet4_edges, radius=FILLET4_R)


solid = part_1.part
